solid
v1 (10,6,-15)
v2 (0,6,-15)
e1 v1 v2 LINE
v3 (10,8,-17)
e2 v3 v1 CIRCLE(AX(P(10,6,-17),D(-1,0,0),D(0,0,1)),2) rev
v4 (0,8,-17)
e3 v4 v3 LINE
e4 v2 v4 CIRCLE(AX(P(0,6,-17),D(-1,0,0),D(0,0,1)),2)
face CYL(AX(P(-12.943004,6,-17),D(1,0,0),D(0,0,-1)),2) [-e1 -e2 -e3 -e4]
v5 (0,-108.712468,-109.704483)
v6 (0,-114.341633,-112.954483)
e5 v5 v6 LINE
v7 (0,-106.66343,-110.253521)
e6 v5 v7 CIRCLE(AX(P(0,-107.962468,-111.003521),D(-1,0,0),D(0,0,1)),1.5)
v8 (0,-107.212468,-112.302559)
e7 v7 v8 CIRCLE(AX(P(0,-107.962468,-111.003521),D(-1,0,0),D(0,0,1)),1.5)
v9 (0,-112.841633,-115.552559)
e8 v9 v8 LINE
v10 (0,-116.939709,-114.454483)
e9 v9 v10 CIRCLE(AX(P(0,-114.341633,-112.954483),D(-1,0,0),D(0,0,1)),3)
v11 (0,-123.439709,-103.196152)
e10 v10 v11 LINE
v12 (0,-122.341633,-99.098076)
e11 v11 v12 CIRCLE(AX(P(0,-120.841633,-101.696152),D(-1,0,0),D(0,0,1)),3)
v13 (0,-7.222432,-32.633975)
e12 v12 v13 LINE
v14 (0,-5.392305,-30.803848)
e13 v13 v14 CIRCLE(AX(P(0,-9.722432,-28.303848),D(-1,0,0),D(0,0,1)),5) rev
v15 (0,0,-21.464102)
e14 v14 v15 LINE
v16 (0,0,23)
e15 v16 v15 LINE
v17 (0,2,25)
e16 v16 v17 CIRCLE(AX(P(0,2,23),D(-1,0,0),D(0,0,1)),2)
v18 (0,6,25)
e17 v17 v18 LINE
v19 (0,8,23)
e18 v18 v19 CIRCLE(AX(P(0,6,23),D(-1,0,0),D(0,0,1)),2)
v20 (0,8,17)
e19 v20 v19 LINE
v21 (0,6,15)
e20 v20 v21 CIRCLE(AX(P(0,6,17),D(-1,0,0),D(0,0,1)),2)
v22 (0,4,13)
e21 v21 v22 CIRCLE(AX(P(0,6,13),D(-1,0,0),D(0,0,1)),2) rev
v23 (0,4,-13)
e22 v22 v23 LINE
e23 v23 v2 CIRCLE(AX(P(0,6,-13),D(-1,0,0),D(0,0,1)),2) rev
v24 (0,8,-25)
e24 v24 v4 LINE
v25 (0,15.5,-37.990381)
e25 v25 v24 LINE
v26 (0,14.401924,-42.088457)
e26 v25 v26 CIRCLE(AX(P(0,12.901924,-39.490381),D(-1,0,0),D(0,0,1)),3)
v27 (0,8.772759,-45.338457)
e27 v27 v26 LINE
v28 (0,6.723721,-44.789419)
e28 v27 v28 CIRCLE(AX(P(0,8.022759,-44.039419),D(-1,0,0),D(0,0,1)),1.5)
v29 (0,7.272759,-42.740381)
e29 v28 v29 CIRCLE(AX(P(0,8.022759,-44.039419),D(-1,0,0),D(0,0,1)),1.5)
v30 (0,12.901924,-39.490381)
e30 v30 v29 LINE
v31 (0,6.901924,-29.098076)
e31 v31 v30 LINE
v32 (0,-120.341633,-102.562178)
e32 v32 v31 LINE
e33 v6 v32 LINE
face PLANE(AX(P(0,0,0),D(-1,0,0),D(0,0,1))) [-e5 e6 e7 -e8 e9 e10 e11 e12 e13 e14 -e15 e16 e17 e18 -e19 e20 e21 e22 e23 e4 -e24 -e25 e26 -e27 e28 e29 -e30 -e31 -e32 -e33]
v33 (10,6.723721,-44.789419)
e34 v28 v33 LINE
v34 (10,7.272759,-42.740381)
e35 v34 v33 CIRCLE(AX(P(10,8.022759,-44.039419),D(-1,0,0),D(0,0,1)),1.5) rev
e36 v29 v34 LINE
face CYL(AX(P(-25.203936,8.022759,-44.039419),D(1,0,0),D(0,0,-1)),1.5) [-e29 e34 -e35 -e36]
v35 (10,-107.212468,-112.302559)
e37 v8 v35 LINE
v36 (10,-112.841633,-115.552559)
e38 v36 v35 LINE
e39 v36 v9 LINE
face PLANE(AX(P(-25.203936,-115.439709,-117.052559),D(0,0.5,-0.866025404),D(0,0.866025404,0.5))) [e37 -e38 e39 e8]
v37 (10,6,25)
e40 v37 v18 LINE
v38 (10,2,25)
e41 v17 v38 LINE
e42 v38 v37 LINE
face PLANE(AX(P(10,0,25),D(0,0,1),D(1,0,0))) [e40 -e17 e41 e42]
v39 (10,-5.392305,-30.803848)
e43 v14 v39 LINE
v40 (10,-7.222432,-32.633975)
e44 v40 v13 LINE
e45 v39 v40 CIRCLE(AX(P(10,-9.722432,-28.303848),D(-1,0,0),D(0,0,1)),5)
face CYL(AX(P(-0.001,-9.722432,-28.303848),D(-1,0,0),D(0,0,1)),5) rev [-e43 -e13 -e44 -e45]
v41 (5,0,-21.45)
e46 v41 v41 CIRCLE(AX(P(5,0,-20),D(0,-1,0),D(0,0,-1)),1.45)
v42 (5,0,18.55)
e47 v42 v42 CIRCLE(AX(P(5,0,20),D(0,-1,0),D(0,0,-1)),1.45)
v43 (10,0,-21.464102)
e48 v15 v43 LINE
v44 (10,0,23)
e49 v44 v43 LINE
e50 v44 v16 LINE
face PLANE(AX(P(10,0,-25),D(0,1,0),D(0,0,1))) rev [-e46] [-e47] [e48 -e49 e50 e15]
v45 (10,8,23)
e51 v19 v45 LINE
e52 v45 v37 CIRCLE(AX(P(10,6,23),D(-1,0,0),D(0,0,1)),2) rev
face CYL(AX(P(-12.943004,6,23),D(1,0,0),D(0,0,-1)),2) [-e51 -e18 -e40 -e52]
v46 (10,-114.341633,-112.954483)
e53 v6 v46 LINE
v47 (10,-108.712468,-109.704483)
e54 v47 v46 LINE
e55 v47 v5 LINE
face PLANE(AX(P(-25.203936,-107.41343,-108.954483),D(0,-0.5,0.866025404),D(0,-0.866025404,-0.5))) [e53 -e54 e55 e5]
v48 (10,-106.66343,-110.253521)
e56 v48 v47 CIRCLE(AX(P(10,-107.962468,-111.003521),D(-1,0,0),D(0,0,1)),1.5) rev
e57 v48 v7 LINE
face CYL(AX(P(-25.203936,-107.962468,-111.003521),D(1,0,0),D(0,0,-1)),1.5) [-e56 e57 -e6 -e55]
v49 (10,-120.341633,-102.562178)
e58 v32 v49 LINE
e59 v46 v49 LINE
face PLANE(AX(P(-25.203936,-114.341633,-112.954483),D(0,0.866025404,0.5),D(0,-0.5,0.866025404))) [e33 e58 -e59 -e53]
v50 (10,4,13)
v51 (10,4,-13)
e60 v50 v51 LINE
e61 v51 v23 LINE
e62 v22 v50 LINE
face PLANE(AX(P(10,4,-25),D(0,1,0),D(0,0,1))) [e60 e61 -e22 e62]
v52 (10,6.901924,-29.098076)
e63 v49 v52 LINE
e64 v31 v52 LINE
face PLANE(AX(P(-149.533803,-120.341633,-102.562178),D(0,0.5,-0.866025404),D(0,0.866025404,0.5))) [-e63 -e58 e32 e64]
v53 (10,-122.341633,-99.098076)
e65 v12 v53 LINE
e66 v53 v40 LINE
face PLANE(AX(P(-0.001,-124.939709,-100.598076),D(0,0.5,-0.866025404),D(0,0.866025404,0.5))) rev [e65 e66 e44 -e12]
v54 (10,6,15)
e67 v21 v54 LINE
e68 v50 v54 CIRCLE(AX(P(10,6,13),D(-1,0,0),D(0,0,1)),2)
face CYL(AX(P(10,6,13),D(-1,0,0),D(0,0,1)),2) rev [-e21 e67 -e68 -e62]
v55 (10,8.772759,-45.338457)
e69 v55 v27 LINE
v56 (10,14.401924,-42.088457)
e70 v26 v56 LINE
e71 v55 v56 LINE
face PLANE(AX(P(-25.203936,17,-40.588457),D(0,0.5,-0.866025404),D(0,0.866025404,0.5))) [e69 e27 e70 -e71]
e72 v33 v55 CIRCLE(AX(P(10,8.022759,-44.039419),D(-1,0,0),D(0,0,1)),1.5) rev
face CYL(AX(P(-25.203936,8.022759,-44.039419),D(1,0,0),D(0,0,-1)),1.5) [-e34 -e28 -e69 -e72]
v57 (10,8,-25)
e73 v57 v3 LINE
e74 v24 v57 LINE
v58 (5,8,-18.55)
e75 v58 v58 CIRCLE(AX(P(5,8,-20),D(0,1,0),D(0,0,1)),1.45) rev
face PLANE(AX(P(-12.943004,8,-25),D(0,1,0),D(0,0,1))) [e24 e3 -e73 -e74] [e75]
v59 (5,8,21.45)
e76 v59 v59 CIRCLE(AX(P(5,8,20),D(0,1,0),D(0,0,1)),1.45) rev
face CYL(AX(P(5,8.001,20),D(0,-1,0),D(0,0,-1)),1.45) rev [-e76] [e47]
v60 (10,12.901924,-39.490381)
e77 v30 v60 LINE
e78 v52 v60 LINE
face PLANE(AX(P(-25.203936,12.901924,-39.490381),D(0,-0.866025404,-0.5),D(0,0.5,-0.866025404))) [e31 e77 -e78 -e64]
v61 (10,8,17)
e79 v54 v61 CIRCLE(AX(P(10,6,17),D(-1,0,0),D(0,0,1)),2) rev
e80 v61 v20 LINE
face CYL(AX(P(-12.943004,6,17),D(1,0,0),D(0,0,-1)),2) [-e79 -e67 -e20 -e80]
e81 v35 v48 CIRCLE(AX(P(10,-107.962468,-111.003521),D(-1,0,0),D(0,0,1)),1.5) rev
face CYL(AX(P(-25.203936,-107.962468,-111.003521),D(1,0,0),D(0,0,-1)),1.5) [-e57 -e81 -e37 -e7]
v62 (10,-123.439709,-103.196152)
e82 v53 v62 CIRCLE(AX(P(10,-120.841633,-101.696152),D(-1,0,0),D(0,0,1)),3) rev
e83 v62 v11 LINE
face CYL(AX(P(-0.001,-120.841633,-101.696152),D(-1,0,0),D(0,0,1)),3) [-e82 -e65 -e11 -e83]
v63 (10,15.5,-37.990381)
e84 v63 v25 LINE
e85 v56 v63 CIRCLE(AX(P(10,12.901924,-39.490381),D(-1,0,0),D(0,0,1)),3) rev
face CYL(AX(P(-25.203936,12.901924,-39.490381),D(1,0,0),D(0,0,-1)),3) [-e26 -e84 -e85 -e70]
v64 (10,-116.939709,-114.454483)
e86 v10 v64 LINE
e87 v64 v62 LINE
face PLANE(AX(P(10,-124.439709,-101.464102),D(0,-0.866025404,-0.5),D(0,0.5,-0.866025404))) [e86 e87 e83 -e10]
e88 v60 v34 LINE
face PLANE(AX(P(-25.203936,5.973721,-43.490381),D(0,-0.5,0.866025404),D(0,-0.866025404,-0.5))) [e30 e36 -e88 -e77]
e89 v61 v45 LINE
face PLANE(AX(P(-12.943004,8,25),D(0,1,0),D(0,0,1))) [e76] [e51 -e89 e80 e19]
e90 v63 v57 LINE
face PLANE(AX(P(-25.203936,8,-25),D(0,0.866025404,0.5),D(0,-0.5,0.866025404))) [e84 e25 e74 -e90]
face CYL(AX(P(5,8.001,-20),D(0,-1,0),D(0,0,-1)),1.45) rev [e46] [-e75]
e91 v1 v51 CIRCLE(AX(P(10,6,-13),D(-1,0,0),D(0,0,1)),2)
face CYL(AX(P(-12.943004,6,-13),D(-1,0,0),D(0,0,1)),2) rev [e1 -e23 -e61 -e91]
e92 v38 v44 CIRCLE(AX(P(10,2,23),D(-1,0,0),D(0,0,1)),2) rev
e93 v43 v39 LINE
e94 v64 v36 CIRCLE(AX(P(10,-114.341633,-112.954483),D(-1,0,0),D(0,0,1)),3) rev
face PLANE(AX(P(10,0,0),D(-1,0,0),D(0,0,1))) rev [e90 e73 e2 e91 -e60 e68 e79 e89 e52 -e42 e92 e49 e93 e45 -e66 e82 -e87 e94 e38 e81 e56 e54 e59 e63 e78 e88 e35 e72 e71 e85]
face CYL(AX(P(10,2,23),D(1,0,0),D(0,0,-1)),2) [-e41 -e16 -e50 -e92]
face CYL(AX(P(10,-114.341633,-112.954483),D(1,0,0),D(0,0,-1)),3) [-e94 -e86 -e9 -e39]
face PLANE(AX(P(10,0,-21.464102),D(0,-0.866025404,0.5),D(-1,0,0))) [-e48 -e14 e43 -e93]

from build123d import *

# Parameters (mm, degrees)
EXTRUDE_1_DEPTH     = 10
SKETCH_4_W          = 10
SKETCH_4_H          = 4
EXTRUDE_2_DEPTH     = 10
CUT_EXTRUDE_1_REACH = 164.425
SKETCH_2_R          = 1.45
FILLET_1_R          = 2
EXTRUDE_3_DEPTH     = 10
FILLET_5_R          = 1.5
EXTRUDE_4_DEPTH     = 10
CUT_EXTRUDE_3_REACH = 174.593
FILLET_3_R          = 3
CHAMFER_1_SIZE      = 7
FILLET_7_R          = 5


with BuildPart() as part:
    # 草图1 → 拉伸-薄壁1 (new body)
    with BuildSketch(Plane(origin=(0, 0, 0), x_dir=(0, 0, -1), z_dir=(1, 0, 0))):
        Polygon((98, -126.439708953), (25, 0), (-25, 0), (-25, 4), (27.309401077, 4), (101.464101615, -124.439708953), align=None)
    extrude(amount=EXTRUDE_1_DEPTH)

    # 草图4 → 凸台-拉伸2 (add)
    with BuildSketch(Plane(origin=(10, 0, 0), x_dir=(0, 0, -1), z_dir=(1, 0, 0))):
        Polygon((27.309401077, 4), (25, 8), (15, 8), (15, 4), align=None)
        with Locations((-20, 6)):
            Rectangle(SKETCH_4_W, SKETCH_4_H)
    extrude(amount=-EXTRUDE_2_DEPTH)

    # 草图2 → 切除-拉伸1 (cut, up to next)
    with BuildSketch(Plane.XZ, mode=Mode.PRIVATE) as cut_extrude_1_sk1:
        with Locations(Location((5, 20, 0), (0, 0, 270))):
            Circle(SKETCH_2_R)
    cut_extrude_1_tool1 = extrude(cut_extrude_1_sk1.sketch, amount=-CUT_EXTRUDE_1_REACH, mode=Mode.PRIVATE) & part.part
    # 草图2 → 切除-拉伸1 (cut, up to next)
    with BuildSketch(Plane.XZ, mode=Mode.PRIVATE) as cut_extrude_1_sk2:
        with Locations(Location((5, -20, 0), (0, 0, 270))):
            Circle(SKETCH_2_R)
    cut_extrude_1_tool2 = extrude(cut_extrude_1_sk2.sketch, amount=-CUT_EXTRUDE_1_REACH, mode=Mode.PRIVATE) & part.part
    add(cut_extrude_1_tool1.solids().sort_by_distance((5, 0, 20))[0], mode=Mode.SUBTRACT)
    add(cut_extrude_1_tool2.solids().sort_by_distance((5, 0, -20))[0], mode=Mode.SUBTRACT)

    # 圆角1
    fillet_1_edges = [part.edges().sort_by_distance(p)[0] for p in [
        (5, 8, 25),
        (5, 4, 15),
        (5, 8, 15),
        (5, 4, -15),
        (5, 8, -15),
        (5, 0, 25),
    ]]
    fillet(fillet_1_edges, radius=FILLET_1_R - 0.0001)  # a hair under: the kernel refuses the full size

    # 草图6 → 凸台-拉伸3 (add)
    with BuildSketch(Plane(origin=(10, 0, 0), x_dir=(0, 0, -1), z_dir=(1, 0, 0))):
        Polygon((25, 8), (40.588457268, 17), (46.088457268, 7.473720558), (43.490381057, 5.973720558), (39.490381057, 12.901923789), (26.5, 5.401923789), align=None)
        Polygon((99.964101615, -121.841632741), (101.464101615, -124.439708953), (117.052558883, -115.439708953), (111.552558883, -105.913429511), (108.954482672, -107.413429511), (112.954482672, -114.341632741), align=None)
    extrude(amount=-EXTRUDE_3_DEPTH)

    # 圆角5
    fillet_5_edges = [part.edges().sort_by_distance(p)[0] for p in [
        (5, -107.413429511, -108.954482672),
        (5, -105.913429511, -111.552558883),
        (5, 5.973720558, -43.490381057),
        (5, 7.473720558, -46.088457268),
    ]]
    fillet(fillet_5_edges, radius=FILLET_5_R - 0.0001)  # a hair under: the kernel refuses the full size

    # 草图7 → 凸台-拉伸4 (add)
    with BuildSketch(Plane(origin=(10, 0, 0), x_dir=(0, 0, -1), z_dir=(1, 0, 0))):
        Polygon((26.5, 5.401923789), (99.964101615, -121.841632741), (102.562177826, -120.341632741), (29.098076211, 6.901923789), align=None)
    extrude(amount=-EXTRUDE_4_DEPTH)

    # 草图8 → 切除-拉伸3 (cut, up to next)
    with BuildSketch(Plane(origin=(10, 0, 0), x_dir=(0, 0, -1), z_dir=(1, 0, 0)), mode=Mode.PRIVATE) as cut_extrude_3_sk1:
        Polygon((25, 0), (98, -126.439708953), (100.598076211, -124.939708953), (28.464101615, 0), align=None)
    cut_extrude_3_tool1 = extrude(cut_extrude_3_sk1.sketch, amount=-CUT_EXTRUDE_3_REACH, mode=Mode.PRIVATE) & part.part
    add(cut_extrude_3_tool1.solids().sort_by_distance((10, -62.8456, -63.01253))[0], mode=Mode.SUBTRACT)

    # 圆角3
    fillet_3_edges = [part.edges().sort_by_distance(p)[0] for p in [
        (5, -115.439708953, -117.052558883),
        (5, -124.939708953, -100.598076211),
        (5, 17, -40.588457268),
    ]]
    fillet(fillet_3_edges, radius=FILLET_3_R)

    # 倒角1
    chamfer_1_edges = [part.edges().sort_by_distance(p)[0] for p in [
        (5, 0, -28.464101615),
    ]]
    chamfer(chamfer_1_edges, length=CHAMFER_1_SIZE)

    # 圆角7
    fillet_7_edges = [part.edges().sort_by_distance(p)[0] for p in [
        (5, -6.062177826, -31.964101615),
    ]]
    fillet(fillet_7_edges, radius=FILLET_7_R)


solid = part.part
